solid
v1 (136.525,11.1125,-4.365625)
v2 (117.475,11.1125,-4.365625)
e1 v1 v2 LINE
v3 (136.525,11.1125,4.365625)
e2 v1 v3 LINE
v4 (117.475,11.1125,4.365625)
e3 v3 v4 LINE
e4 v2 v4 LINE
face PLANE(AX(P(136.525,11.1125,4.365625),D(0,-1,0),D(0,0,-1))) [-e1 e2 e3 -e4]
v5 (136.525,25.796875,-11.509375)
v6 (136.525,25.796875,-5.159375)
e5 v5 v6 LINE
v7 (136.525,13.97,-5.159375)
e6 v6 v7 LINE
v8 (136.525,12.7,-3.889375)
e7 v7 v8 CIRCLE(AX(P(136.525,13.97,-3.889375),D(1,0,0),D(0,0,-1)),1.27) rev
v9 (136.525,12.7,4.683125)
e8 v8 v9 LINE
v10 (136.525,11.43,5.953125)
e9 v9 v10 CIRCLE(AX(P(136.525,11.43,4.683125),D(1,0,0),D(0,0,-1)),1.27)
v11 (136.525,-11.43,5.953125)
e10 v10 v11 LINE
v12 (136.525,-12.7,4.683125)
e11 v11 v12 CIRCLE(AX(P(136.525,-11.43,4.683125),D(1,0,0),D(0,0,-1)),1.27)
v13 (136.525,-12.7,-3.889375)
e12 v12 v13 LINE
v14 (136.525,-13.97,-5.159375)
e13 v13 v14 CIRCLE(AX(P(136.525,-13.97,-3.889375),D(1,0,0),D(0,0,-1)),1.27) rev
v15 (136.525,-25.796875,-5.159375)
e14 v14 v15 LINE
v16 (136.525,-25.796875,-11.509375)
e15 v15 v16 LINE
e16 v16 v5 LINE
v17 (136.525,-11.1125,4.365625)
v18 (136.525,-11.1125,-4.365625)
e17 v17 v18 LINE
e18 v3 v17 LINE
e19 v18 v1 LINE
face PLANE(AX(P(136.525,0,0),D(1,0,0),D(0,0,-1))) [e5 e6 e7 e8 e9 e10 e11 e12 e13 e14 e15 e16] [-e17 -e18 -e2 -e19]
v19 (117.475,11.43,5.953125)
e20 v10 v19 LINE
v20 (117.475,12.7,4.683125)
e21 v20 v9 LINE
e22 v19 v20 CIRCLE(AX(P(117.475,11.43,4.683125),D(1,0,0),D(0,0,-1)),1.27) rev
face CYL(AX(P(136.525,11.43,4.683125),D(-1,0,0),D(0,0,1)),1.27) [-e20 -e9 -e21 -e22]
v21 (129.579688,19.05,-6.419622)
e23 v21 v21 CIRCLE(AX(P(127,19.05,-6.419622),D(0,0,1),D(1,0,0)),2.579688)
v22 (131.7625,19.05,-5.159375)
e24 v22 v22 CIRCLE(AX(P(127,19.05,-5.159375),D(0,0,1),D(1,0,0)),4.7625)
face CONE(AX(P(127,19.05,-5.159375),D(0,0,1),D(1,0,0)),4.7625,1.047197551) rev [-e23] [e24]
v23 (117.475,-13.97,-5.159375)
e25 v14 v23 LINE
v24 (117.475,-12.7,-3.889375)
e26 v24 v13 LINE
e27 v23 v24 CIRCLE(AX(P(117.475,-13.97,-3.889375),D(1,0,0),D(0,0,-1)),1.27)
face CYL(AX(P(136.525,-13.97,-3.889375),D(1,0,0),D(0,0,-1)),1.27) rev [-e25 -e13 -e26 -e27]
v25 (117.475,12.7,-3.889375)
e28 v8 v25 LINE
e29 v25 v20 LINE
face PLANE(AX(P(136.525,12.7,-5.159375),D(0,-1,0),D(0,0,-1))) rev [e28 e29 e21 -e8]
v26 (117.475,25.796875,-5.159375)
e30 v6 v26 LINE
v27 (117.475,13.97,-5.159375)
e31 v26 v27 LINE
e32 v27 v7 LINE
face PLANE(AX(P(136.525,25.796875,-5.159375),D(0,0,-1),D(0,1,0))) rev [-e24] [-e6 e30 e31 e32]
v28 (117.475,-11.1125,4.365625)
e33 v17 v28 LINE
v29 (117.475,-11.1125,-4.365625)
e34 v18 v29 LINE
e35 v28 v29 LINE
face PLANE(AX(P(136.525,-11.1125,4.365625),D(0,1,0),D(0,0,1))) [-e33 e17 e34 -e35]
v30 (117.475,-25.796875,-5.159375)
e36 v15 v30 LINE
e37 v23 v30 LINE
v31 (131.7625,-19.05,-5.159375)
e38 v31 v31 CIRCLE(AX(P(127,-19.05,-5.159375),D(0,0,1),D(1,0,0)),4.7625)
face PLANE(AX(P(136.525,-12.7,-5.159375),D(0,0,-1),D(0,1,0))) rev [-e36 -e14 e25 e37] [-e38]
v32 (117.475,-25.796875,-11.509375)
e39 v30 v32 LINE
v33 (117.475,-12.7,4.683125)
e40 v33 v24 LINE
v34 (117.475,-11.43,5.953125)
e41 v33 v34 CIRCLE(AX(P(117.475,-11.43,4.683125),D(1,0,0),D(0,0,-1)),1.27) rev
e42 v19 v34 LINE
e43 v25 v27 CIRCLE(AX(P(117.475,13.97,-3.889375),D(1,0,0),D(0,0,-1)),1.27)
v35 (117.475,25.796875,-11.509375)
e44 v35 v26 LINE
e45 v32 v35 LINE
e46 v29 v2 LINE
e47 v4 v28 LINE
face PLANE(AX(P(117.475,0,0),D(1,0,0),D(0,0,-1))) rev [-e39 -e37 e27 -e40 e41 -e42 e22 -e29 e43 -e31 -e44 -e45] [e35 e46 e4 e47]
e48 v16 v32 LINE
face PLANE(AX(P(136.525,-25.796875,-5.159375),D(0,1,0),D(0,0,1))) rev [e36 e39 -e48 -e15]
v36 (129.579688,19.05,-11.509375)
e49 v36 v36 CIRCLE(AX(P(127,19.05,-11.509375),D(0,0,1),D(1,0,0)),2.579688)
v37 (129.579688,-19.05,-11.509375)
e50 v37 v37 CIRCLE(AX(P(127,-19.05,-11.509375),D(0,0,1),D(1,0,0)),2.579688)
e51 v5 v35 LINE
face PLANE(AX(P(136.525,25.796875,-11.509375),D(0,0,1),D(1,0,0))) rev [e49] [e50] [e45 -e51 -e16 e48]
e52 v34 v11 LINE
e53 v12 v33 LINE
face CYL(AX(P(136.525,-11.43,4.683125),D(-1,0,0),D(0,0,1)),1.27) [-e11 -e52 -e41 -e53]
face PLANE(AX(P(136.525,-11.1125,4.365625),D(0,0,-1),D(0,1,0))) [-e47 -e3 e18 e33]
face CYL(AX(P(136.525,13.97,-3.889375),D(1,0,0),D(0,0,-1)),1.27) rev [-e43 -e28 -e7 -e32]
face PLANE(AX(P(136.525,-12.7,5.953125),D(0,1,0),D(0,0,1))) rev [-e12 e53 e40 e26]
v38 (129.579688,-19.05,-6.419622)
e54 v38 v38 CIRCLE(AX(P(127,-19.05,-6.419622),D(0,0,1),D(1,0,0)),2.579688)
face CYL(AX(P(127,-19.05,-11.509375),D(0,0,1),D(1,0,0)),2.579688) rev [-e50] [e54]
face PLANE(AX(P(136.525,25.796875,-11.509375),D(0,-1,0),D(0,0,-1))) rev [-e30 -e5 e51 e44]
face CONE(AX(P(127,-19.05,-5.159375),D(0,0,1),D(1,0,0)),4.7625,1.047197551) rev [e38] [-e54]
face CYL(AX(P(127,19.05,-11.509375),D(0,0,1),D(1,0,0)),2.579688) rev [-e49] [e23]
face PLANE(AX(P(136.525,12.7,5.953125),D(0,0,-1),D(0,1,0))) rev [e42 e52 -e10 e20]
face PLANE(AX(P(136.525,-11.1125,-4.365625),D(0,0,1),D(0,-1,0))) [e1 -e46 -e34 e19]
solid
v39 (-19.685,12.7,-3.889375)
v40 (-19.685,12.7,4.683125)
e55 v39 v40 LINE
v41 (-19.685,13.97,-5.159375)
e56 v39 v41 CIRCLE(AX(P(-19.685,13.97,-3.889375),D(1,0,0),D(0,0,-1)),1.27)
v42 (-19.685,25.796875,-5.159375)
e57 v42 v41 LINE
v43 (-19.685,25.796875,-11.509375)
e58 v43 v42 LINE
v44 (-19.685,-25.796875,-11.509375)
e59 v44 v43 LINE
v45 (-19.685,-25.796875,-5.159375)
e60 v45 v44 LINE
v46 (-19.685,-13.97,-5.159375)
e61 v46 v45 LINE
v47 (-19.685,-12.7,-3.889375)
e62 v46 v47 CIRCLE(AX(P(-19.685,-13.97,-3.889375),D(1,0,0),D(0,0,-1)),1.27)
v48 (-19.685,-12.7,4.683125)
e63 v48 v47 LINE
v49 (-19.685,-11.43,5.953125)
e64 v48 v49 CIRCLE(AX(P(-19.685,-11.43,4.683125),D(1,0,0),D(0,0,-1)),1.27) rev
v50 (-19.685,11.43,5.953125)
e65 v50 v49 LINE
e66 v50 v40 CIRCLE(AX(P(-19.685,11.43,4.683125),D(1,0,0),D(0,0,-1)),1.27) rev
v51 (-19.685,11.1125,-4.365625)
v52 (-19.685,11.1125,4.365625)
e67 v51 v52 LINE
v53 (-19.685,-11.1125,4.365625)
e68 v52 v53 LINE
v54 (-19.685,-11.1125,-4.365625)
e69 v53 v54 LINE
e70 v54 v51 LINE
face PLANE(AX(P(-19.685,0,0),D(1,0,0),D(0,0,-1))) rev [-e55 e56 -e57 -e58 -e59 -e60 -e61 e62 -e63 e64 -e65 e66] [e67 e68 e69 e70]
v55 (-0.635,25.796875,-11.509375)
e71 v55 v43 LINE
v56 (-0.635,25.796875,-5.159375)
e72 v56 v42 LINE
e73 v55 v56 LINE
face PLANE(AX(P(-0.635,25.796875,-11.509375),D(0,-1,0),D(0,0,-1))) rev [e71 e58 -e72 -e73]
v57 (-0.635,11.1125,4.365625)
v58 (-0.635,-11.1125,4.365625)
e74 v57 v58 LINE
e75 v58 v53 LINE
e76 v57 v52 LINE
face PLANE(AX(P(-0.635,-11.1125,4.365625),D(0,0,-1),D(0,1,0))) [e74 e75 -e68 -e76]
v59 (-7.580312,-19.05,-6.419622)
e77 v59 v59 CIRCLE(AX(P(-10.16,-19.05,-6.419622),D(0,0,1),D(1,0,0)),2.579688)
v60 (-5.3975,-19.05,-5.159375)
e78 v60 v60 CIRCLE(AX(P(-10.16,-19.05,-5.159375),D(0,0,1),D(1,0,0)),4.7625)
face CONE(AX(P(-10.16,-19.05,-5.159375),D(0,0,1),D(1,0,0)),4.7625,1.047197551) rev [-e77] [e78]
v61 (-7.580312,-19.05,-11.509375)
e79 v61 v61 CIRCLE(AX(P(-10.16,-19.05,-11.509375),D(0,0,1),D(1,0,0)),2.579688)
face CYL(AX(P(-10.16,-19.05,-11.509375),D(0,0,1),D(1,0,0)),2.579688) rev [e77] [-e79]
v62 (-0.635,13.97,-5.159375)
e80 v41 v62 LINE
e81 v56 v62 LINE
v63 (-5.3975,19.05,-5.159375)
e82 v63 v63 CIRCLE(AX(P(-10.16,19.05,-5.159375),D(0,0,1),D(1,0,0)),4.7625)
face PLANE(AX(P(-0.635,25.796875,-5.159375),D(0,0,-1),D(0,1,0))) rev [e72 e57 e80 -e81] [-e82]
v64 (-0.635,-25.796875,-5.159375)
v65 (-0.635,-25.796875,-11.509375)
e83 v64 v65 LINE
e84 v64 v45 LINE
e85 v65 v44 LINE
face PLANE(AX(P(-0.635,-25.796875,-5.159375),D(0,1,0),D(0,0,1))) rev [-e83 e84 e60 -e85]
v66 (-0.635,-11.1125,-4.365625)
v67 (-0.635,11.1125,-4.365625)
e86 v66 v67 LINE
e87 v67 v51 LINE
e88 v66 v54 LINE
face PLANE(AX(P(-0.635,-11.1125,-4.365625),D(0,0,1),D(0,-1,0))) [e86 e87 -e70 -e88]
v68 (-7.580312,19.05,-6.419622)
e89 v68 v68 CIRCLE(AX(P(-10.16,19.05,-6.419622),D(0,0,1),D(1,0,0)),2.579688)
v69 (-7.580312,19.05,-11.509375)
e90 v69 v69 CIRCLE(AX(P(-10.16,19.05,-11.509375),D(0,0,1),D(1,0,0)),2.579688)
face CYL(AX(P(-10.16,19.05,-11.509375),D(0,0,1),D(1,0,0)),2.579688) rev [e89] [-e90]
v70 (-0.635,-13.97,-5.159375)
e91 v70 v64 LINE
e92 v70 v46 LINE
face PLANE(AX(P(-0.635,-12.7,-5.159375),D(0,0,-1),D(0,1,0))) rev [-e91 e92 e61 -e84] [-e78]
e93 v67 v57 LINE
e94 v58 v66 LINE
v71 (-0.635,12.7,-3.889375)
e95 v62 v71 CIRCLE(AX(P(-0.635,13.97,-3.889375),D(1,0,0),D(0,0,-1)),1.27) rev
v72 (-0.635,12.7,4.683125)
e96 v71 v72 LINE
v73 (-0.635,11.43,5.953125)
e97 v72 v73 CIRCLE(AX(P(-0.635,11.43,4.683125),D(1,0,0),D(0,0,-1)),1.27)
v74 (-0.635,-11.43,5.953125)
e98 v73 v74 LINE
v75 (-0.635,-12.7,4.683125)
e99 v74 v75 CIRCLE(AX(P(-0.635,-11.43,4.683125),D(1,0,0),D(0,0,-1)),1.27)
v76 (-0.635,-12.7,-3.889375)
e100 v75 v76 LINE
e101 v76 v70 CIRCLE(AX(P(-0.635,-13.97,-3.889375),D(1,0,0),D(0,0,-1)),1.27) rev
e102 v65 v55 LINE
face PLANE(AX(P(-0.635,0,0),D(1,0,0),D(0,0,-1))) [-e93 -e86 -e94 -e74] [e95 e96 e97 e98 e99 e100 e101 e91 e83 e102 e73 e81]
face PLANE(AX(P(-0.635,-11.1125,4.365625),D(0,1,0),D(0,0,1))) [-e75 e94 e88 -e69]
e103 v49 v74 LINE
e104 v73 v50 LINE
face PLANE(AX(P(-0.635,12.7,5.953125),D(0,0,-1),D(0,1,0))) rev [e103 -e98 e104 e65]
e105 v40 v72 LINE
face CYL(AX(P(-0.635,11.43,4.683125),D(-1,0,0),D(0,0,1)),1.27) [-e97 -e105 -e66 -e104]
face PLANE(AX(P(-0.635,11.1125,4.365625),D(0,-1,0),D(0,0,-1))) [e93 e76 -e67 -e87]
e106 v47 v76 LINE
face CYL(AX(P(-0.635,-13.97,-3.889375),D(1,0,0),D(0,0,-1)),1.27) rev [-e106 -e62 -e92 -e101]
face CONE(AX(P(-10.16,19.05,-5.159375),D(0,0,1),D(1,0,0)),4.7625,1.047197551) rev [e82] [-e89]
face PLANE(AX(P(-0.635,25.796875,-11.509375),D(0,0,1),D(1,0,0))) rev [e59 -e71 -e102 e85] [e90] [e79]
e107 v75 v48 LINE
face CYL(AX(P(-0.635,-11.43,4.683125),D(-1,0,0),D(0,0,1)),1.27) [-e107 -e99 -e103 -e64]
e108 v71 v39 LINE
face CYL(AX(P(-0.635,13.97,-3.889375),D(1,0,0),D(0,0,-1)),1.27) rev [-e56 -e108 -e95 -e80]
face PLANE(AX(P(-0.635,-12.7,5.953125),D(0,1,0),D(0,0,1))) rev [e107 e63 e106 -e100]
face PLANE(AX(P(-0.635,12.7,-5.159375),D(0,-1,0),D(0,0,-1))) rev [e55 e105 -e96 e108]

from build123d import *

# Parameters (mm, degrees)
BOSS_EXTRUDE1_DEPTH      = 3.175
BOSS_EXTRUDE1_DEPTH_BACK = 3.175
SKETCH4_W                = 203.2
SKETCH4_H                = 19.05
CHAMFER1_SIZE            = 1.27
SKETCH5_R                = 7.9375
BOSS_EXTRUDE2_DEPTH      = 12.7
BOSS_EXTRUDE3_DEPTH      = 3.175
CHAMFER2_SIZE            = 1.27
FILLET1_R                = 0.635
FILLET2_R                = 0.254
SKETCH7_W                = 8.73125
SKETCH7_H                = 22.225
BOSS_EXTRUDE4_DEPTH      = 9.525
SKETCH8_R                = 2.5796875
CUT_EXTRUDE1_DEPTH       = 157.452333308
FILLET4_R                = 1.27
PATTERN_LINEAR_1_COUNT   = 2
PATTERN_LINEAR_1_PITCH   = 137.16


with BuildPart() as part:
    # Sketch4 → Boss-Extrude1 (new, two sides: drawn at the far end of the back side and taken through both)
    with BuildSketch(Plane.XY.offset(-BOSS_EXTRUDE1_DEPTH_BACK)):
        with Locations((-50.8, 0)):
            Rectangle(SKETCH4_W, SKETCH4_H)
    extrude(amount=BOSS_EXTRUDE1_DEPTH + BOSS_EXTRUDE1_DEPTH_BACK)

    # Chamfer1
    chamfer1_edges = [part.edges().sort_by_distance(p)[0] for p in [
        (50.8, 0, 3.175),
        (50.8, 0, -3.175),
        (50.8, 9.525, 0),
        (50.8, -9.525, 0),
    ]]
    chamfer(chamfer1_edges, length=CHAMFER1_SIZE)

    # Sketch5 → Boss-Extrude2 (add)
    with BuildSketch(Plane.XY.offset(3.175)):
        with Locations((-142.875, 0)):
            Circle(SKETCH5_R)
    extrude(amount=BOSS_EXTRUDE2_DEPTH)

    # Sketch6 → Boss-Extrude3 (add)
    with BuildSketch(Plane.XY.offset(15.875)):
        Polygon((-151.892, -9.525), (-133.858, -9.525), (-133.35, -9.017), (-133.35, 9.017), (-133.858, 9.525), (-151.892, 9.525), (-152.4, 9.017), (-152.4, -9.017), align=None)
    extrude(amount=BOSS_EXTRUDE3_DEPTH)

    # Chamfer2
    # the kernel refuses this chamfer: 1.27 mm, written as the material it takes off along each edge
    with BuildSketch(Plane(origin=(-130.591962605, 9.525, 19.05), x_dir=(0, -0.9996219169112966, 0.027495876610587302), z_dir=(-1, 0, 0)), Plane(origin=(-133.35, -12.283037395, 19.05), x_dir=(-0.9996219169112966, 0, 0.027495876610586965), z_dir=(0, 1, 0)), Plane(origin=(-152.4, 12.283037395, 19.05), x_dir=(0.9996219169112966, 0, 0.027495876610586965), z_dir=(0, -1, 0))) as chamfer2_piece_1:
        Polygon((CHAMFER2_SIZE * 0.999621916911, -CHAMFER2_SIZE * 0.0274958766106), (-CHAMFER2_SIZE * 0.0274958766106, -CHAMFER2_SIZE * 0.999621916911), (0, 0), align=None)
    extrude(amount=24.566074789, mode=Mode.SUBTRACT)
    with BuildSketch(Plane(origin=(-155.158037395, -9.525, 19.05), x_dir=(0, -0.02749587661058591, -0.9996219169112968), z_dir=(1, 0, 0))) as chamfer2_piece_2:
        Polygon((CHAMFER2_SIZE * 0.999621916911, CHAMFER2_SIZE * 0.0274958766106), (-CHAMFER2_SIZE * 0.0274958766106, CHAMFER2_SIZE * 0.999621916911), (0, 0), align=None)
    extrude(amount=24.566074789, mode=Mode.SUBTRACT)

    # Fillet1
    fillet1_edges = [part.edges().sort_by_distance(p)[0] for p in [
        (-150.8125, 0, 3.175),
        (-150.8125, 0, 15.875),
    ]]
    fillet(fillet1_edges, radius=FILLET1_R)

    # Fillet2
    fillet2_edges = [part.edges().sort_by_distance(p)[0] for p in [
        (-152.146, 9.271, 15.875),
        (-152.4, 0, 15.875),
        (-152.146, -9.271, 15.875),
        (-142.875, -9.525, 15.875),
        (-133.604, -9.271, 15.875),
        (-133.35, 0, 15.875),
        (-133.604, 9.271, 15.875),
        (-142.875, 9.525, 15.875),
    ]]
    fillet(fillet2_edges, radius=FILLET2_R)


with BuildPart() as body_2:
    # Sketch7 → Boss-Extrude4 (new, symmetric)
    with BuildSketch(Plane(origin=(127, 0, 0), x_dir=(0, 0, -1), z_dir=(1, 0, 0))):
        Polygon((11.509375, 25.796875), (11.509375, -25.796875), (5.159375, -25.796875), (5.159375, -12.7), (-5.953125, -12.7), (-5.953125, 12.7), (5.159375, 12.7), (5.159375, 25.796875), align=None)
        Rectangle(SKETCH7_W, SKETCH7_H, mode=Mode.SUBTRACT)
    extrude(amount=BOSS_EXTRUDE4_DEPTH, both=True)

    # Sketch8 → Cut-Extrude1 (cut, through all)
    with BuildSketch(Plane.XY.offset(-5.159375)):
        with Locations((127, 19.05)):
            Circle(SKETCH8_R)
        with Locations((127, -19.05)):
            Circle(SKETCH8_R)
    extrude(amount=-CUT_EXTRUDE1_DEPTH, mode=Mode.SUBTRACT)

    # Cut-Extrude2 cone 1 section (through the dimple's axis) → Cut-Extrude2 (revolve, cut)
    with BuildSketch(Plane(origin=(127, 19.05, -5.159375), x_dir=(0, -1, 0), z_dir=(1, 0, 0))):
        Polygon((0, 0), (4.7625, 0), (0, 2.749630657), align=None)
    revolve(axis=Axis((127, 19.05, -5.159375), (0, 0, -1)), mode=Mode.SUBTRACT)

    # Cut-Extrude3 cone 1 section (through the dimple's axis) → Cut-Extrude3 (revolve, cut)
    with BuildSketch(Plane(origin=(127, -19.05, -5.159375), x_dir=(0, -1, 0), z_dir=(1, 0, 0))):
        Polygon((0, 0), (4.7625, 0), (0, 2.749630657), align=None)
    revolve(axis=Axis((127, -19.05, -5.159375), (0, 0, -1)), mode=Mode.SUBTRACT)

    # Fillet4
    fillet4_edges = [body_2.edges().sort_by_distance(p)[0] for p in [
        (127, -12.7, -5.159375),
        (127, -12.7, 5.953125),
        (127, 12.7, 5.953125),
        (127, 12.7, -5.159375),
    ]]
    fillet(fillet4_edges, radius=FILLET4_R)


with BuildPart() as pattern_linear_1_1:
    # 阵列(线性)1: pattern copy
    add(body_2.part.moved(Location(Vector(-1, 0, 0) * (1 * PATTERN_LINEAR_1_PITCH))))


solid = Compound([body_2.part, pattern_linear_1_1.part])
